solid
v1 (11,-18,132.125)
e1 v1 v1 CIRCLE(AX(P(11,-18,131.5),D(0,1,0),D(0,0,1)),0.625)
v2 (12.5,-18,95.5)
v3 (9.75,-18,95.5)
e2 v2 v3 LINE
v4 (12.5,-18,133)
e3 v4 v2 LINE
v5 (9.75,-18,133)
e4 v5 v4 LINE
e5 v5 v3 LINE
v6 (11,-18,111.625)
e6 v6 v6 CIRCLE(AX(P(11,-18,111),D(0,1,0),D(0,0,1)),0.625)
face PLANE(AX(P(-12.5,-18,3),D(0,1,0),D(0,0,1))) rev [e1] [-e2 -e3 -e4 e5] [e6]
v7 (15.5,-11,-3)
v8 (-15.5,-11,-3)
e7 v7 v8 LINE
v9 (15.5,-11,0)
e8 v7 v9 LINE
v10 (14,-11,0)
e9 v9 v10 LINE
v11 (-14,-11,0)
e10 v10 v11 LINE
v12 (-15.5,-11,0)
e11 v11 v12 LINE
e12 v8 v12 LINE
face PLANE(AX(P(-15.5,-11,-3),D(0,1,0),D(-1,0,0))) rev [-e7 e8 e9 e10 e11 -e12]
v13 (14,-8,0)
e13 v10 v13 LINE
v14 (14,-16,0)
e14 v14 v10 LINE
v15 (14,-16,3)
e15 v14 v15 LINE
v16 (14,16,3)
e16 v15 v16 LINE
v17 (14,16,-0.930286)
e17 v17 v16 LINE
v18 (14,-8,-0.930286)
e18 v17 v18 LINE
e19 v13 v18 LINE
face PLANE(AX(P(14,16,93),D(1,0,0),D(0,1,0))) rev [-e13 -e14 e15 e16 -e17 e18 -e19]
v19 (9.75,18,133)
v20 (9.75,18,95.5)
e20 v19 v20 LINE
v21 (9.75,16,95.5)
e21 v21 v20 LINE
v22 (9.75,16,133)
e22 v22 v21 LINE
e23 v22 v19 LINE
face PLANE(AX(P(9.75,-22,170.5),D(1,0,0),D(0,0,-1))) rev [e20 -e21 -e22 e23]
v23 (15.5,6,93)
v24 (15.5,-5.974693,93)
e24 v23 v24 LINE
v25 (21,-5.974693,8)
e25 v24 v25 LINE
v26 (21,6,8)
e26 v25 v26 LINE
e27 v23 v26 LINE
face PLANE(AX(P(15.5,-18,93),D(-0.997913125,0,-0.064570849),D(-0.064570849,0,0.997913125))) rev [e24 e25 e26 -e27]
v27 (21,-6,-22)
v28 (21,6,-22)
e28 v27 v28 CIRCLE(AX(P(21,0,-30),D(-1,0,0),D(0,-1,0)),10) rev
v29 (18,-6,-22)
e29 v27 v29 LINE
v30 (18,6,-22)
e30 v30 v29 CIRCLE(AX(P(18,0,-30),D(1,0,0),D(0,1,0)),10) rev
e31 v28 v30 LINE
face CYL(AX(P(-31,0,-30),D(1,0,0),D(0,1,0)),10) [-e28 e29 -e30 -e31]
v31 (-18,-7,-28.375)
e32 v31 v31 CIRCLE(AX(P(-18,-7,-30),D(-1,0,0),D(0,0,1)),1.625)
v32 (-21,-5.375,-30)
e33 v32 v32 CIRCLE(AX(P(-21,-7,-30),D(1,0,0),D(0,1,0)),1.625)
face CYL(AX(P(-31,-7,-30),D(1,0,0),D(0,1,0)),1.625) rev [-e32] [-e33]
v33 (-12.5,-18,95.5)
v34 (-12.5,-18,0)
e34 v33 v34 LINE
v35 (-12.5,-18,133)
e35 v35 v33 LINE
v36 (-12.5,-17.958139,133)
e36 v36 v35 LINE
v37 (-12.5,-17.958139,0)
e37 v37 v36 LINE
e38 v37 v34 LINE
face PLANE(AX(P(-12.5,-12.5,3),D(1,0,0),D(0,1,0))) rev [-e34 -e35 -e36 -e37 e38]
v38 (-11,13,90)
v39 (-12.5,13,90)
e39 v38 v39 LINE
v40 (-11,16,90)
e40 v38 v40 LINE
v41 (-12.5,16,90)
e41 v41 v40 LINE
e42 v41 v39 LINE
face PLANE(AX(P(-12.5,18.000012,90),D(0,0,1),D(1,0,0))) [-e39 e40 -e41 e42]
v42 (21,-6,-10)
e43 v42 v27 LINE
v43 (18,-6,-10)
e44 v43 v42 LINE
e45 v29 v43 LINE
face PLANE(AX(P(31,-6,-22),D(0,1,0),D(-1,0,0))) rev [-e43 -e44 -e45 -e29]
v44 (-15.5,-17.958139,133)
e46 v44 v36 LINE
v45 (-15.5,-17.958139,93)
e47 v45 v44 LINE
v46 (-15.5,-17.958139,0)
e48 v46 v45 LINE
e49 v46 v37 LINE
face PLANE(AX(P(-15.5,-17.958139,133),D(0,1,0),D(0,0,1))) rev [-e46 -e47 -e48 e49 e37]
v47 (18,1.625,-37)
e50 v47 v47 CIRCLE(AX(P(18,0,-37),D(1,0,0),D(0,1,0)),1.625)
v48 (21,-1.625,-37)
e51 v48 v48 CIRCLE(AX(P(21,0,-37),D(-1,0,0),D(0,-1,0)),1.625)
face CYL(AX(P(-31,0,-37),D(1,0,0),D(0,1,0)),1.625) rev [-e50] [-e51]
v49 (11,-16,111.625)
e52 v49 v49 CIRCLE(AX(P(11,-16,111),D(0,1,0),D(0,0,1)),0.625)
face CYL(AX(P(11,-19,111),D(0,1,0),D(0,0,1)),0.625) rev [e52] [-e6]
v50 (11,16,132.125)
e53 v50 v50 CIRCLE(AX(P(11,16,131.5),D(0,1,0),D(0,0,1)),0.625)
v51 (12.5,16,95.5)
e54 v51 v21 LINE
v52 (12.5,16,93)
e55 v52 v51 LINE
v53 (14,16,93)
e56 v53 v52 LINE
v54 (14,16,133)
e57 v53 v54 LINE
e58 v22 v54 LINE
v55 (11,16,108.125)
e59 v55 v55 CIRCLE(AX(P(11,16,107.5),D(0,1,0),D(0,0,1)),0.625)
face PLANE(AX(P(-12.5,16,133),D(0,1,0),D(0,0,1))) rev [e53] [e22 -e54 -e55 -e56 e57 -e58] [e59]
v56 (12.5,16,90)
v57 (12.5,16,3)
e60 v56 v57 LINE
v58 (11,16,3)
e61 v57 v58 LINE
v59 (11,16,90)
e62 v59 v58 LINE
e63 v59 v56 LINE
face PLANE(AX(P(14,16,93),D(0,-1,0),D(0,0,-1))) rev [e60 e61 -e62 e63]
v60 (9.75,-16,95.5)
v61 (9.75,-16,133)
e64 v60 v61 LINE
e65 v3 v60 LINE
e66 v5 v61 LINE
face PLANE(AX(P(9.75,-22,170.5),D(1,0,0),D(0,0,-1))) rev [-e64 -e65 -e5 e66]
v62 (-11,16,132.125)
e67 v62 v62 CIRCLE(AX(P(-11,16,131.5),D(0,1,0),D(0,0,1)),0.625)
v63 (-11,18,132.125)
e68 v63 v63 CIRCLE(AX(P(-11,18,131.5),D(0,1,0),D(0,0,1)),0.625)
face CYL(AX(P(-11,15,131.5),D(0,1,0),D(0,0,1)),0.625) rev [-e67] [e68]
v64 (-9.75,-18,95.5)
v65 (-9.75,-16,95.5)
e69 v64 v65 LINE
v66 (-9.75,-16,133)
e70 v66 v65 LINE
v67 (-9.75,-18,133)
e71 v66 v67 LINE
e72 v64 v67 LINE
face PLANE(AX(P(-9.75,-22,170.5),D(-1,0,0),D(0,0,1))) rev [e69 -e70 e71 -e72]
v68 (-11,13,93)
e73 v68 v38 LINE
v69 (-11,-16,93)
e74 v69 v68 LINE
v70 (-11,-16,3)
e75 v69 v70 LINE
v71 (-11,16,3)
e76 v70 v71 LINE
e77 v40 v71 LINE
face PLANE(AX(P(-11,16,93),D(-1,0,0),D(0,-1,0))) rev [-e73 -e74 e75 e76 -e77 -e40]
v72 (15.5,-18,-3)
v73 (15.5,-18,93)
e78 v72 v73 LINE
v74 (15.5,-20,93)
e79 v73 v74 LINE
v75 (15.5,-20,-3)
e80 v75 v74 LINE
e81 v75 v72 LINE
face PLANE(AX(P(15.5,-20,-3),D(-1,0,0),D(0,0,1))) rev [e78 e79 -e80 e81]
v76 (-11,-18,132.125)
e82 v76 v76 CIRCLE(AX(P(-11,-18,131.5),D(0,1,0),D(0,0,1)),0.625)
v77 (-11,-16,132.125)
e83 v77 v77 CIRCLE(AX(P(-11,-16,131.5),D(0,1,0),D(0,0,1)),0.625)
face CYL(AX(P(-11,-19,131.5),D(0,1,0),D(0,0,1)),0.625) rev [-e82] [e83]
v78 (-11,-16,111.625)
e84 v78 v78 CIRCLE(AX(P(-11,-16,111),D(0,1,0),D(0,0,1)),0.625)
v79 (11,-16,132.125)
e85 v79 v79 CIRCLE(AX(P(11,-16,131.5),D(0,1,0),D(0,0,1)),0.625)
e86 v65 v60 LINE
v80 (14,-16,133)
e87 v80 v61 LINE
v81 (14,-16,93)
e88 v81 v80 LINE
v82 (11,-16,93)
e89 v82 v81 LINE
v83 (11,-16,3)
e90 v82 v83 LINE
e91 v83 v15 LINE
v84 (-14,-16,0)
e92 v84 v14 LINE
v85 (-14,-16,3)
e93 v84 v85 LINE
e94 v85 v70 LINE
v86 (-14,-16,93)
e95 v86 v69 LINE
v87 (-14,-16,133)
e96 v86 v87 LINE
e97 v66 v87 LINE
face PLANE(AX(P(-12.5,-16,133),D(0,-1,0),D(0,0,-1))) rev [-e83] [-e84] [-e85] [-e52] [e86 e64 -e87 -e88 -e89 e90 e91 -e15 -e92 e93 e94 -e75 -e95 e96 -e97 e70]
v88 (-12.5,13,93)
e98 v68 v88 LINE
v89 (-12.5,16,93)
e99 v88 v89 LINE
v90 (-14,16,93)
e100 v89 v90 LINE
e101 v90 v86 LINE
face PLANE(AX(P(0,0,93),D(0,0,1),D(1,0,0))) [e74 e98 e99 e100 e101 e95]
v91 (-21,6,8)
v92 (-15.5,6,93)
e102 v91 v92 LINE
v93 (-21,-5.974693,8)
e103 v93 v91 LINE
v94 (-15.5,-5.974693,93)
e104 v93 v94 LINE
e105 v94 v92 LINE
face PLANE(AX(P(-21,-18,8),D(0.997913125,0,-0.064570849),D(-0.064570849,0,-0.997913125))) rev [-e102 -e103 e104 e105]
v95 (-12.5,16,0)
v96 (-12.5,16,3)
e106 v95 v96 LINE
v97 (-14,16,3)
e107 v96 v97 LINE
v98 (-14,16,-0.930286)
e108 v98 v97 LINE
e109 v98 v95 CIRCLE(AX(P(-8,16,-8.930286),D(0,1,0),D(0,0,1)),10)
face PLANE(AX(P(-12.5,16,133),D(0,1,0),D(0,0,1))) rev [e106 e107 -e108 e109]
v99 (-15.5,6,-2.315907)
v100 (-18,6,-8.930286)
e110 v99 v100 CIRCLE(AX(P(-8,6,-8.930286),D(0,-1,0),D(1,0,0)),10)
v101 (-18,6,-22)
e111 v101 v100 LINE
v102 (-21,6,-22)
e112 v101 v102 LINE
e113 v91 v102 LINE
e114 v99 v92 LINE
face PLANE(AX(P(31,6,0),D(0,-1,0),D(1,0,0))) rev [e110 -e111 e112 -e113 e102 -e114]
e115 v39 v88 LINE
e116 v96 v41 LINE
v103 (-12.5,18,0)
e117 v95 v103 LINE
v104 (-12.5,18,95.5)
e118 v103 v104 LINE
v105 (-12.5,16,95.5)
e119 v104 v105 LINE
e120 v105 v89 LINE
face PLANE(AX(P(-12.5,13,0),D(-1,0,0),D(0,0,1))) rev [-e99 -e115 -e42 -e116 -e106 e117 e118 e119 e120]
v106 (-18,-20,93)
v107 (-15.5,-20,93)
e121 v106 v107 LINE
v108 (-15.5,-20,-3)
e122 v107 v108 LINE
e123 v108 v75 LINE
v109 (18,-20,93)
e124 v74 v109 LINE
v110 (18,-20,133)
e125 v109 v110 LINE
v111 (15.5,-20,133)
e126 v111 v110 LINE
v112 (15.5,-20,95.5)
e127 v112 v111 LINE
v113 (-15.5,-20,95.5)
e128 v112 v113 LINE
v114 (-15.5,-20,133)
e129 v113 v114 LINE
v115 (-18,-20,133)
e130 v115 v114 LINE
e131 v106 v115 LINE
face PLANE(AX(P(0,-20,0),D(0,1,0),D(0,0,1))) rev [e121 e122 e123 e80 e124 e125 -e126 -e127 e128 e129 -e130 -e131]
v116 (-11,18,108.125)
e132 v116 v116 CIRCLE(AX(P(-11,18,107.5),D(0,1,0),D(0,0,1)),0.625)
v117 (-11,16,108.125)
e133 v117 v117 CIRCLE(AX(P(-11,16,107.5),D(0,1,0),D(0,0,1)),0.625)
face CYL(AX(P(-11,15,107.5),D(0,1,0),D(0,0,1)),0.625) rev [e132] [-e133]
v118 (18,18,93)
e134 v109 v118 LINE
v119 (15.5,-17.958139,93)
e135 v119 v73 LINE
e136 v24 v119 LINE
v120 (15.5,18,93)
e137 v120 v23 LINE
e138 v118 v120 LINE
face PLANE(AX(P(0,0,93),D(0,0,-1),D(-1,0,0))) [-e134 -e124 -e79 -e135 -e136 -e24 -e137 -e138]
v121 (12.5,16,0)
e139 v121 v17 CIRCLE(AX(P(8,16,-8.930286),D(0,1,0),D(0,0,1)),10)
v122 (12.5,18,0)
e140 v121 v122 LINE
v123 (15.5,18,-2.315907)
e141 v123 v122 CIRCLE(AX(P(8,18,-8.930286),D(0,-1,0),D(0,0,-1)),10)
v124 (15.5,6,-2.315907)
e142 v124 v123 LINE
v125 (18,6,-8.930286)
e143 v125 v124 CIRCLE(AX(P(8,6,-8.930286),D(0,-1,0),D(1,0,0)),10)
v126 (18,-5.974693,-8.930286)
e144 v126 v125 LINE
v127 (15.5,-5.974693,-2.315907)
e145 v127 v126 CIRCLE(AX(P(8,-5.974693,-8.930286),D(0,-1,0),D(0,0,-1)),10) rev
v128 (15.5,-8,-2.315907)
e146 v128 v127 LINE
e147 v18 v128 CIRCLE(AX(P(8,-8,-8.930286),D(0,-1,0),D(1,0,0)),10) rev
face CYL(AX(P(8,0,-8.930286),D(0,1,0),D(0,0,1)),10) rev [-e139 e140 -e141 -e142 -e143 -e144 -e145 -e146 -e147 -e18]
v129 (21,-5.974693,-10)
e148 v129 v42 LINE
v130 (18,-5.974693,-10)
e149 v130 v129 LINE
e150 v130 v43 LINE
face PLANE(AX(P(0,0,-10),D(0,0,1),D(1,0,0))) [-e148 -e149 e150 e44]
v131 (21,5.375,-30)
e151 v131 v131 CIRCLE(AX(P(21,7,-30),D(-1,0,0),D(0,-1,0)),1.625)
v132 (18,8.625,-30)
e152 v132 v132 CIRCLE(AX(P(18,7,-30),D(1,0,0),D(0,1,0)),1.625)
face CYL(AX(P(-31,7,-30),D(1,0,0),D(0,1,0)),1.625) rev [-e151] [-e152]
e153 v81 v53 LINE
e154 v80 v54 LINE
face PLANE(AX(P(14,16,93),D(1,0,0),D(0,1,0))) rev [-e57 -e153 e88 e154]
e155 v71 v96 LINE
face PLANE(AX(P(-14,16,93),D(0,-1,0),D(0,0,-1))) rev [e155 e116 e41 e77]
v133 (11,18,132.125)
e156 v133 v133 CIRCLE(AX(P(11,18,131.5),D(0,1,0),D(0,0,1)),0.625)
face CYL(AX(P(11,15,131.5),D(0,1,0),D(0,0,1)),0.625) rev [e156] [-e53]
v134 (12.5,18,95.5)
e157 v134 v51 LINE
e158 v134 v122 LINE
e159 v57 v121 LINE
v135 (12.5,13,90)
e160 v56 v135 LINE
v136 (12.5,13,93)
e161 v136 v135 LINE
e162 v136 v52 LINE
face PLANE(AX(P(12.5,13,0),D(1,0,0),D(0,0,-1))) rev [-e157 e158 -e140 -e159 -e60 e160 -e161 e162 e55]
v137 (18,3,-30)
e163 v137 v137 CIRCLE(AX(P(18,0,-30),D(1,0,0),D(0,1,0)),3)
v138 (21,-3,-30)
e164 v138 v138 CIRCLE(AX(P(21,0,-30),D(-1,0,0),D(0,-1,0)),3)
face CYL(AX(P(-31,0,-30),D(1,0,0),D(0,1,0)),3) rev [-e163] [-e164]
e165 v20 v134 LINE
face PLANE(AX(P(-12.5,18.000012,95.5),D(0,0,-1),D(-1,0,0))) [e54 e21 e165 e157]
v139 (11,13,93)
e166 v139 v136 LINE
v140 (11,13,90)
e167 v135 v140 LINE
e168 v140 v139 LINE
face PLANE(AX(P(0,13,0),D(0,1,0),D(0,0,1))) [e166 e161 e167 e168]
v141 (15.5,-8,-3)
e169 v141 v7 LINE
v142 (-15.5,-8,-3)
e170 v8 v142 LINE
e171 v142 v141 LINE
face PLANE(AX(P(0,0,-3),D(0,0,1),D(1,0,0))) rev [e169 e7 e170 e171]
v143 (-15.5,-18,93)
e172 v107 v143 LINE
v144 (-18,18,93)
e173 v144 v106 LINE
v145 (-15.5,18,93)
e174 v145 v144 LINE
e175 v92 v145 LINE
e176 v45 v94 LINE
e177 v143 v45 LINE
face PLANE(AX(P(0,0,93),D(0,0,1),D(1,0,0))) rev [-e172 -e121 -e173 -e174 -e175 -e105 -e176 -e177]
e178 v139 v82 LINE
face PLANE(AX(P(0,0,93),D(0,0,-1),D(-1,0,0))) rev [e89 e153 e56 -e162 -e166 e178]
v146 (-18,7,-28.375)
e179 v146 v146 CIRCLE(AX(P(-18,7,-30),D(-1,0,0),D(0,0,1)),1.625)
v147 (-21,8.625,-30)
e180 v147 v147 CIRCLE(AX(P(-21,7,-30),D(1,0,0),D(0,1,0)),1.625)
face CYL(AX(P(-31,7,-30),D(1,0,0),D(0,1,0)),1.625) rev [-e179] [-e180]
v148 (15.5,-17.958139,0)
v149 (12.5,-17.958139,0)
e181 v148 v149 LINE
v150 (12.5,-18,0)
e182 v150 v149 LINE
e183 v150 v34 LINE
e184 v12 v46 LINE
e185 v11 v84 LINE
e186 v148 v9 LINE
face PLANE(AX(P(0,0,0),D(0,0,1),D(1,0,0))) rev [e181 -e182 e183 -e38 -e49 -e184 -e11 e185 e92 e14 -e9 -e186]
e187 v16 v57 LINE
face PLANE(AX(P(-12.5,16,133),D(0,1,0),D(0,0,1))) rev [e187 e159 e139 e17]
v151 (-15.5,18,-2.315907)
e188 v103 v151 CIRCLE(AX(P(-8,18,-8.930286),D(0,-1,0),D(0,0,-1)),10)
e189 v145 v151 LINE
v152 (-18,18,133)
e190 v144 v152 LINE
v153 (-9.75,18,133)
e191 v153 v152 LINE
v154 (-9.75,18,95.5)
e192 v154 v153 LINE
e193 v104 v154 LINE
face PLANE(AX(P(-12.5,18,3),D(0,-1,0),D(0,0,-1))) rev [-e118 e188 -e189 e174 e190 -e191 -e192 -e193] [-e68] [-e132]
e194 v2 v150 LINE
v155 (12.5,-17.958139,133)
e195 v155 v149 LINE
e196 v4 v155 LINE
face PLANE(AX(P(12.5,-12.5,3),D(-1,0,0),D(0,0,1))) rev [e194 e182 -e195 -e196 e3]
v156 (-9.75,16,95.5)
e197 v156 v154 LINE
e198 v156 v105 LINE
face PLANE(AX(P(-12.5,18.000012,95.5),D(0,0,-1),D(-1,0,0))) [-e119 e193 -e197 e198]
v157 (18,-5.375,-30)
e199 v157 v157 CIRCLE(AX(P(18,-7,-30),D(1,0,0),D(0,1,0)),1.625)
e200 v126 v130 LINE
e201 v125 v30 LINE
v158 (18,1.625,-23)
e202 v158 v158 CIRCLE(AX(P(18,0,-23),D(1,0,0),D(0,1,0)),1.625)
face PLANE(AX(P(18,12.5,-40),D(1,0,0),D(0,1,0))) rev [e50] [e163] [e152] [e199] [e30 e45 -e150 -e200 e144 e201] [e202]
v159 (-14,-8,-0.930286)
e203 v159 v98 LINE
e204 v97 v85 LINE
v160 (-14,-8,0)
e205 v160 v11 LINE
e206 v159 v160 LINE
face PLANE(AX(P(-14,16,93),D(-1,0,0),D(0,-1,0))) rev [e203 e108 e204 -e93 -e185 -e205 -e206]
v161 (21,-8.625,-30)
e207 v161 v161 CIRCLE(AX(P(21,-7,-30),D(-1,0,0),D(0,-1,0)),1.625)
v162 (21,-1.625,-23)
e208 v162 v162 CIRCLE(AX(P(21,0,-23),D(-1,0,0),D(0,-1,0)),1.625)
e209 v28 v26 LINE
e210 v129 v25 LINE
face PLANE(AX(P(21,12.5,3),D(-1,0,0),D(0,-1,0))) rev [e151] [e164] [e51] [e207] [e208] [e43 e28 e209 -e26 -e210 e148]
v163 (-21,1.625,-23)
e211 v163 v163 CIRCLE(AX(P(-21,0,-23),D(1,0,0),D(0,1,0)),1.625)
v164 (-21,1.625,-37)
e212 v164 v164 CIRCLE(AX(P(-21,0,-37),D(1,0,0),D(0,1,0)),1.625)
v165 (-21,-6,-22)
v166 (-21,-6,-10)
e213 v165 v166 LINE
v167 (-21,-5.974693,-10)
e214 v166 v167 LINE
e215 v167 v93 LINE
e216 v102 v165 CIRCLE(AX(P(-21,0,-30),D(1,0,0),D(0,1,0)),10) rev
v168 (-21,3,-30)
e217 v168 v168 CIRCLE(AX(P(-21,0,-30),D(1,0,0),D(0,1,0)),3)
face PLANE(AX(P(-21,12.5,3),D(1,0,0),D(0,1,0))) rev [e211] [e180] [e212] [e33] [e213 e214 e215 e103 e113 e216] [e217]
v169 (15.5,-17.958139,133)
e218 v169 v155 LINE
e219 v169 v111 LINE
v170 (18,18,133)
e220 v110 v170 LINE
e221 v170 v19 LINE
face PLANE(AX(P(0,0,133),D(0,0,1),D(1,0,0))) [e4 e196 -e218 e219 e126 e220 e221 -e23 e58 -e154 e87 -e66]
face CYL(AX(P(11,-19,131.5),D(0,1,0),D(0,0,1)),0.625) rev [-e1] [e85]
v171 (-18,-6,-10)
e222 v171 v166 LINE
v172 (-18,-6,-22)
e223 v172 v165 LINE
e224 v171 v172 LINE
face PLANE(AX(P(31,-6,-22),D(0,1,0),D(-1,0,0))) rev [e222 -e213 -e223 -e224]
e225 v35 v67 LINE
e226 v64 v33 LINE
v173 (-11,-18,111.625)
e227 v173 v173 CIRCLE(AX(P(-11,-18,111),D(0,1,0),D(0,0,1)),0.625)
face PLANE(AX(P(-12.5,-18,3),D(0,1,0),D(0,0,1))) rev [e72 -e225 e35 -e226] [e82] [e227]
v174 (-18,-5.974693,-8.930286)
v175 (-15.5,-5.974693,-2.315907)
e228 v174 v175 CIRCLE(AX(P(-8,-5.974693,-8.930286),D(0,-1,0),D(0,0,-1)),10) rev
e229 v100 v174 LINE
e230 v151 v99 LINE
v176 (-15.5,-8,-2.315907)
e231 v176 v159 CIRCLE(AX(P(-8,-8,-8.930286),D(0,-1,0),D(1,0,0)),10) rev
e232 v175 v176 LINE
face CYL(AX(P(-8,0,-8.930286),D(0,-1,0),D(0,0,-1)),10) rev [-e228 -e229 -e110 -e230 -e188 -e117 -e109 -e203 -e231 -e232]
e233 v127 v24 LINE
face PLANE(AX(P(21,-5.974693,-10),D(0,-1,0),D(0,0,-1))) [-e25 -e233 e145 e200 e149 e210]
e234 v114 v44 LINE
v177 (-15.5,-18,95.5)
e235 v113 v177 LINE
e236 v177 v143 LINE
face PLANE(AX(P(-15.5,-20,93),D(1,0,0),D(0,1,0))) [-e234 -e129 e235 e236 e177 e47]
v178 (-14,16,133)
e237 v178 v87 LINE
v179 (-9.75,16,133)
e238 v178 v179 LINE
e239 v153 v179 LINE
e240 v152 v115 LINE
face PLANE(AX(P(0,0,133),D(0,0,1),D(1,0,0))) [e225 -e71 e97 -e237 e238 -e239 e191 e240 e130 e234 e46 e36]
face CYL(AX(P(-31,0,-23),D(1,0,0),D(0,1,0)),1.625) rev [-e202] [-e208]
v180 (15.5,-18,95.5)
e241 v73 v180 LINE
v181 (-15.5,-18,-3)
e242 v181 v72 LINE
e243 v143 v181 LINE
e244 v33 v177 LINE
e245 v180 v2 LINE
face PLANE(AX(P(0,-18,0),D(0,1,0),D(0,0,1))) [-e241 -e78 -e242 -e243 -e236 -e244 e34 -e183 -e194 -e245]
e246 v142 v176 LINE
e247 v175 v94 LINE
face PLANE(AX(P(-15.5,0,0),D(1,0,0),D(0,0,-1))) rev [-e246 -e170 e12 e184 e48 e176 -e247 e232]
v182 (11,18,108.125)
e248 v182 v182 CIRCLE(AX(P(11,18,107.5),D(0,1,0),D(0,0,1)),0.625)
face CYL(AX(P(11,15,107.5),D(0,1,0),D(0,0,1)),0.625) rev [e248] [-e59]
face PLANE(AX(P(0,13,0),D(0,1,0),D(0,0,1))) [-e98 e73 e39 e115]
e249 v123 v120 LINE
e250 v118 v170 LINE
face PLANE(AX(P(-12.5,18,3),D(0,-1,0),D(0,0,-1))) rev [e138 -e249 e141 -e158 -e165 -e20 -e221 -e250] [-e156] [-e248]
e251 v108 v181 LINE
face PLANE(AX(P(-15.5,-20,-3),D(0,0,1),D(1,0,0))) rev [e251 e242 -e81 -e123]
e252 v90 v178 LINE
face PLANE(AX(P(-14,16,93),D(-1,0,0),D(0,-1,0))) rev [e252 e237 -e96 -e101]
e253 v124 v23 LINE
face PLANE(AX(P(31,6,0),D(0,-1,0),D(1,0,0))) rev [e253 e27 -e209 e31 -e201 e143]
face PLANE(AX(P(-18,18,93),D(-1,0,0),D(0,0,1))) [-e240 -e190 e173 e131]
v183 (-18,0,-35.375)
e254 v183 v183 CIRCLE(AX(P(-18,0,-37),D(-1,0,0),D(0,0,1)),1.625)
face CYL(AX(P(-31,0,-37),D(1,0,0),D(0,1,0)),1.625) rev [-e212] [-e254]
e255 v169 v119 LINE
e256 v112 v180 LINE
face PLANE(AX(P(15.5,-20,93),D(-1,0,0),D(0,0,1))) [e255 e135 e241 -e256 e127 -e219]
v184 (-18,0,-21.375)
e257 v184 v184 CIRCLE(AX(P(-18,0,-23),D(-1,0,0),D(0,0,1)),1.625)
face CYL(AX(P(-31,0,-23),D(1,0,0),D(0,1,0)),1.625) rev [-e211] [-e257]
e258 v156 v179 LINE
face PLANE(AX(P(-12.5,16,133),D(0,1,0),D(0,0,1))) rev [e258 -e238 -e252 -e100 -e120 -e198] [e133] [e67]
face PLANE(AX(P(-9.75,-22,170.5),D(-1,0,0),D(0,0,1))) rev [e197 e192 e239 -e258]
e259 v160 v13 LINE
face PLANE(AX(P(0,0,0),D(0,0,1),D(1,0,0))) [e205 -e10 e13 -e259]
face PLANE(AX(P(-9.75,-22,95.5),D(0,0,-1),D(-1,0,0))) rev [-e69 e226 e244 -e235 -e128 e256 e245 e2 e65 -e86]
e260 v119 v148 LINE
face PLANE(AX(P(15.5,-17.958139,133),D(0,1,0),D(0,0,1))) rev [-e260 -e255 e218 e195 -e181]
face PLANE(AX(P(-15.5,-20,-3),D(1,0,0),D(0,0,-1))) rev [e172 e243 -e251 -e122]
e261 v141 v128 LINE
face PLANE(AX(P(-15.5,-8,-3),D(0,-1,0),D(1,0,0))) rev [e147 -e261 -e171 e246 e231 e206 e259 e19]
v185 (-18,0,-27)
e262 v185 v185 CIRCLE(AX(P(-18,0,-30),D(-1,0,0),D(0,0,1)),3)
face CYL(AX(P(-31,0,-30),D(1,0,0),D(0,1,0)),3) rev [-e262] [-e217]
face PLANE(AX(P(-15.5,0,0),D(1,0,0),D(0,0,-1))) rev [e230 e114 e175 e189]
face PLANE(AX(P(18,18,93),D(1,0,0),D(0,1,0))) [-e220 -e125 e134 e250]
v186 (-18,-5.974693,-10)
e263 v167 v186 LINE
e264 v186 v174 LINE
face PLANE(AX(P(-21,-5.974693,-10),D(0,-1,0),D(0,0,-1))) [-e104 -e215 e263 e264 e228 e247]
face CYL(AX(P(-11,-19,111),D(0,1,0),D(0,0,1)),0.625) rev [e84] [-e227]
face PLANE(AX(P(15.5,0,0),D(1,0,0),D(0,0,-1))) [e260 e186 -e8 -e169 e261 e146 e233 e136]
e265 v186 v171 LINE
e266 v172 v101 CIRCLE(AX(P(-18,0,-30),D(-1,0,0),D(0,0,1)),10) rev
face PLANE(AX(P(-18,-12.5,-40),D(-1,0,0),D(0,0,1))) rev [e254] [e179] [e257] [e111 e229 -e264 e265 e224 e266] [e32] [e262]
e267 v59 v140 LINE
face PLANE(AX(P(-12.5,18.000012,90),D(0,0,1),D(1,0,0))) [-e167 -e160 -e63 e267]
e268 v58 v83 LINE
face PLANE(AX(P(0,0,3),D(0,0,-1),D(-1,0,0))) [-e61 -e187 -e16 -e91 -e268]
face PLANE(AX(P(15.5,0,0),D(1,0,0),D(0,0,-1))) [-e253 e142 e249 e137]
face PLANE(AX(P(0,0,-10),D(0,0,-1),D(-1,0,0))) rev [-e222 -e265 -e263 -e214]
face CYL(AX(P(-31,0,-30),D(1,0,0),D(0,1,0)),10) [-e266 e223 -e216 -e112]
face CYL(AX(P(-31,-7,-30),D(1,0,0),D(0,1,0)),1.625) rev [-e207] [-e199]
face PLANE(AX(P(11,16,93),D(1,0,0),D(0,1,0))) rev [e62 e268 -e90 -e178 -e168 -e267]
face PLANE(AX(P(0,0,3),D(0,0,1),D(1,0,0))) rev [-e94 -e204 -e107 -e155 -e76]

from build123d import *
from build123d.topology import SkipClean

# Parameters (mm, degrees)
BOSS_EXTRUDE1_DEPTH      = 3
SKETCH2_W                = 25
SKETCH2_H                = 2
BOSS_EXTRUDE2_DEPTH      = 130
SKETCH3_R                = 0.625
CUT_EXTRUDE1_DEPTH       = 3
SKETCH4_R                = 0.625
CUT_EXTRUDE2_DEPTH       = 3
SKETCH5_W                = 3
SKETCH5_H                = 25
BOSS_EXTRUDE3_DEPTH      = 40
SKETCH7_W                = 19.5
SKETCH7_H                = 75
CUT_EXTRUDE5_DEPTH       = 40
SKETCH10_W               = 25
SKETCH10_H               = 3
BOSS_EXTRUDE4_DEPTH      = 10
SKETCH11_W               = 25
SKETCH11_H               = 3
BOSS_EXTRUDE5_DEPTH      = 10
SKETCH12_W               = 3
SKETCH12_H               = 25
BOSS_EXTRUDE6_DEPTH      = 10
SKETCH13_W               = 3
SKETCH13_H               = 25
BOSS_EXTRUDE7_DEPTH      = 10
SKETCH14_W               = 133
SKETCH14_H               = 35.95813892
BOSS_EXTRUDE11_DEPTH     = 3
SKETCH15_W               = 133
SKETCH15_H               = 35.95813892
BOSS_EXTRUDE12_DEPTH     = 3
SKETCH16_W               = 23
SKETCH16_H               = 28
CUT_EXTRUDE6_DEPTH       = 13
CUT_EXTRUDE7_DEPTH       = 146.523194028
CUT_EXTRUDE7_DEPTH_BACK  = 146.523194028
SKETCH6_R                = 1.625
SKETCH6_R_2              = 3
FILLET1_R                = 10
FILLET2_R                = 10
SKETCH17_W               = 3
SKETCH17_H               = 2.5
CUT_EXTRUDE8_DEPTH       = 30
SKETCH19_W               = 28
SKETCH19_H               = 32
CUT_EXTRUDE9_DEPTH       = 40
CUT_EXTRUDE11_DEPTH      = 137.54669531
CUT_EXTRUDE11_DEPTH_BACK = 137.54669531
SKETCH20_W               = 25.25
SKETCH20_H               = 11.847644437
SKETCH20_W_2             = 25
SKETCH20_H_2             = 13.837487399
CUT_EXTRUDE12_DEPTH      = 144.934012659
CUT_EXTRUDE12_DEPTH_BACK = 144.934012659
CUT_EXTRUDE13_DEPTH      = 138.746143322
CUT_EXTRUDE13_DEPTH_BACK = 138.746143322
SKETCH22_W               = 10
SKETCH22_H               = 25
CUT_EXTRUDE14_DEPTH      = 10
CUT_EXTRUDE14_DEPTH_BACK = 10
SKETCH24_W               = 5.5
SKETCH24_H               = 6.5
SKETCH24_H_2             = 6.525307194
CUT_EXTRUDE15_DEPTH      = 176.197031938
CUT_EXTRUDE15_DEPTH_BACK = 176.197031938
SKETCH25_W               = 28
SKETCH25_H               = 32
SKETCH31_W               = 25
SKETCH31_H               = 90
CUT_EXTRUDE17_DEPTH      = 5
SKETCH32_W               = 31
SKETCH32_H               = 3
BOSS_EXTRUDE16_DEPTH     = 3
SKETCH33_W               = 5.5
SKETCH33_H               = 11.974692806
SKETCH33_W_2             = 3
SKETCH33_H_2             = 32
BOSS_EXTRUDE17_DEPTH     = 90
CUT_EXTRUDE18_DEPTH      = 137.769879725
CUT_EXTRUDE18_DEPTH_BACK = 137.769879725
FILLET3_START            = -5.974692806
FILLET3_DEPTH            = 11.974692806
FILLET3_START_2          = -10
FILLET3_2_DEPTH          = 28
FILLET3_START_3          = 16
FILLET3_3_DEPTH          = 2
FILLET4_START            = -5.974692806
FILLET4_DEPTH            = 11.974692806
FILLET4_START_2          = -10
FILLET4_2_DEPTH          = 28
FILLET4_START_3          = 16
FILLET4_3_DEPTH          = 2
SKETCH35_W               = 31
SKETCH35_H               = 98.5
BOSS_EXTRUDE18_DEPTH     = 2
SKETCH38_W               = 2.5
SKETCH38_H               = 38
BOSS_EXTRUDE22_DEPTH     = 40
CUT_EXTRUDE19_DEPTH      = 140.907112042
CUT_EXTRUDE19_DEPTH_BACK = 5
SKETCH39_W               = 25
SKETCH39_H               = 5.5


with BuildPart() as part:
    # Sketch1 → Boss-Extrude1 (new body)
    with BuildSketch(Plane.XY):
        Polygon((12.5, 12.5), (21, 12.5), (21, -12.5), (12.5, -12.5), (12.5, -18), (-12.5, -18), (-12.5, -12.5), (-21, -12.5), (-21, 12.5), (-12.5, 12.5), (-12.5, 18), (12.5, 18), align=None)
    extrude(amount=BOSS_EXTRUDE1_DEPTH)

    # Sketch2 → Boss-Extrude2 (add)
    with BuildSketch(Plane.XY.offset(3)):
        with Locations((0, 17)):
            Rectangle(SKETCH2_W, SKETCH2_H)
        with Locations((0, -17)):
            Rectangle(SKETCH2_W, SKETCH2_H)
    extrude(amount=BOSS_EXTRUDE2_DEPTH)

    # Sketch3 → Cut-Extrude1 (cut)
    with BuildSketch(Plane(origin=(0, 18, 0), x_dir=(1, 0, 0), z_dir=(0, 1, 0))):
        with Locations(Location((-11, -107.5, 0), (0, 0, 270))):
            Circle(SKETCH3_R)
        with Locations(Location((11, -107.5, 0), (0, 0, 270))):
            Circle(SKETCH3_R)
        with Locations(Location((-11, -131.5, 0), (0, 0, 270))):
            Circle(SKETCH3_R)
        with Locations(Location((11, -131.5, 0), (0, 0, 270))):
            Circle(SKETCH3_R)
    extrude(amount=-CUT_EXTRUDE1_DEPTH, mode=Mode.SUBTRACT)

    # Sketch4 → Cut-Extrude2 (cut)
    with BuildSketch(Plane(origin=(0, -16, 0), x_dir=(1, 0, 0), z_dir=(0, 1, 0))):
        with Locations(Location((-11, -131.5, 0), (0, 0, 270))):
            Circle(SKETCH4_R)
        with Locations(Location((11, -131.5, 0), (0, 0, 270))):
            Circle(SKETCH4_R)
        with Locations(Location((-11, -111, 0), (0, 0, 270))):
            Circle(SKETCH4_R)
        with Locations(Location((11, -111, 0), (0, 0, 270))):
            Circle(SKETCH4_R)
    extrude(amount=-CUT_EXTRUDE2_DEPTH, mode=Mode.SUBTRACT)

    # Sketch5 → Boss-Extrude3 (add)
    with BuildSketch(Plane(origin=(0, 0, 0), x_dir=(-1, 0, 0), z_dir=(0, 0, -1))):
        with Locations((-19.5, 0)):
            Rectangle(SKETCH5_W, SKETCH5_H)
        with Locations((19.5, 0)):
            Rectangle(SKETCH5_W, SKETCH5_H)
    extrude(amount=BOSS_EXTRUDE3_DEPTH)

    # Sketch7 → Cut-Extrude5 (cut)
    with BuildSketch(Plane(origin=(0, 18, 0), x_dir=(1, 0, 0), z_dir=(0, 1, 0))):
        with Locations((0, -133)):
            Rectangle(SKETCH7_W, SKETCH7_H)
    extrude(amount=-CUT_EXTRUDE5_DEPTH, mode=Mode.SUBTRACT)

    # Sketch10 → Boss-Extrude4 (add)
    with BuildSketch(Plane(origin=(0, 18, 0), x_dir=(1, 0, 0), z_dir=(0, 1, 0))):
        with Locations((0, -1.5)):
            Rectangle(SKETCH10_W, SKETCH10_H)
    extrude(amount=BOSS_EXTRUDE4_DEPTH)

    # Sketch11 → Boss-Extrude5 (add)
    with BuildSketch(Plane.XZ.offset(18)):
        with Locations((0, 1.5)):
            Rectangle(SKETCH11_W, SKETCH11_H)
    extrude(amount=BOSS_EXTRUDE5_DEPTH)

    # Sketch12 → Boss-Extrude6 (add)
    with BuildSketch(Plane.ZY.offset(21)):
        with Locations((1.5, 0)):
            Rectangle(SKETCH12_W, SKETCH12_H)
    extrude(amount=BOSS_EXTRUDE6_DEPTH)

    # Sketch13 → Boss-Extrude7 (add)
    with BuildSketch(Plane(origin=(21, 0, 0), x_dir=(0, 0, -1), z_dir=(1, 0, 0))):
        with Locations((-1.5, 0)):
            Rectangle(SKETCH13_W, SKETCH13_H)
    extrude(amount=BOSS_EXTRUDE7_DEPTH)

    # Sketch14 → Boss-Extrude11 (add)
    with BuildSketch(Plane.ZY.offset(12.5)):
        with Locations((66.5, 0.02093054)):
            Rectangle(SKETCH14_W, SKETCH14_H)
    extrude(amount=BOSS_EXTRUDE11_DEPTH)

    # Sketch15 → Boss-Extrude12 (add)
    with BuildSketch(Plane(origin=(12.5, 0, 0), x_dir=(0, 0, -1), z_dir=(1, 0, 0))):
        with Locations((-66.5, 0.02093054)):
            Rectangle(SKETCH15_W, SKETCH15_H)
    extrude(amount=BOSS_EXTRUDE12_DEPTH)

    # Sketch16 → Cut-Extrude6 (cut)
    with BuildSketch(Plane(origin=(0, 0, 0), x_dir=(-1, 0, 0), z_dir=(0, 0, -1))):
        Rectangle(SKETCH16_W, SKETCH16_H)
    extrude(amount=-CUT_EXTRUDE6_DEPTH, mode=Mode.SUBTRACT)

    # Sketch6 → Cut-Extrude7 (cut, two sides: drawn at the far end of the back side and taken through both)
    with BuildSketch(Plane(origin=(21, 0, 0), x_dir=(0, 0, -1), z_dir=(1, 0, 0)).offset(-CUT_EXTRUDE7_DEPTH_BACK)):
        with Locations(Location((30, 7, 0), (0, 0, 90))):
            Circle(SKETCH6_R)
        with Locations(Location((30, 0, 0), (0, 0, 90))):
            Circle(SKETCH6_R_2)
        with Locations(Location((37, 0, 0), (0, 0, 90))):
            Circle(SKETCH6_R)
        with Locations(Location((30, -7, 0), (0, 0, 90))):
            Circle(SKETCH6_R)
        with Locations(Location((23, 0, 0), (0, 0, 90))):
            Circle(SKETCH6_R)
        with BuildLine():
            Line((30, 10), (30, 12.5))
            Line((30, 12.5), (46.457343261, 12.5))
            Line((46.457343261, 12.5), (46.457343261, -12.5))
            Line((46.457343261, -12.5), (30, -12.5))
            Line((30, -12.5), (30, -10))
            ThreePointArc((30, -10), (40, 0), (30, 10))
        make_face()
    extrude(amount=CUT_EXTRUDE7_DEPTH + CUT_EXTRUDE7_DEPTH_BACK, mode=Mode.SUBTRACT)

    # Fillet1
    fillet1_edges = [part.edges().sort_by_distance(p)[0] for p in [
        (31, 12.5, 1.5),
    ]]
    fillet(fillet1_edges, radius=FILLET1_R)

    # Fillet2
    fillet2_edges = [part.edges().sort_by_distance(p)[0] for p in [
        (12.5, 28, 1.5),
        (-12.5, 28, 1.5),
        (-31, 12.5, 1.5),
        (12.5, -28, 1.5),
        (-31, -12.5, 1.5),
        (-12.5, -28, 1.5),
        (31, -12.5, 1.5),
    ]]
    fillet(fillet2_edges, radius=FILLET2_R - 0.0001)  # a hair under: the kernel refuses the full size

    # Sketch17 → Cut-Extrude8 (cut)
    with BuildSketch(Plane(origin=(0, 0, -30), x_dir=(-1, 0, 0), z_dir=(0, 0, -1))):
        with Locations((-19.5, 11.25)):
            Rectangle(SKETCH17_W, SKETCH17_H)
        with Locations((-19.5, -11.25)):
            Rectangle(SKETCH17_W, SKETCH17_H)
        with Locations((19.5, 11.25)):
            Rectangle(SKETCH17_W, SKETCH17_H)
        with Locations((19.5, -11.25)):
            Rectangle(SKETCH17_W, SKETCH17_H)
    extrude(amount=-CUT_EXTRUDE8_DEPTH, mode=Mode.SUBTRACT)

    # Sketch19 → Cut-Extrude9 (cut)
    with BuildSketch(Plane.XY.offset(133)):
        Rectangle(SKETCH19_W, SKETCH19_H)
    extrude(amount=-CUT_EXTRUDE9_DEPTH, mode=Mode.SUBTRACT)

    # Sketch20 → Cut-Extrude11 (cut, two sides: drawn at the far end of the back side and taken through both)
    with BuildSketch(Plane.XY.offset(3).offset(-CUT_EXTRUDE11_DEPTH_BACK)):
        with Locations((0, 23.923822218)):
            Rectangle(SKETCH20_W, SKETCH20_H)
        with Locations((0, -24.918743699)):
            Rectangle(SKETCH20_W_2, SKETCH20_H_2)
    extrude(amount=CUT_EXTRUDE11_DEPTH + CUT_EXTRUDE11_DEPTH_BACK, mode=Mode.SUBTRACT)

    # Sketch21 → Cut-Extrude12 (cut, two sides: drawn at the far end of the back side and taken through both)
    with SkipClean():  # the faces are left unmerged after this step: merging them gives an invalid solid
        with BuildSketch(Plane.ZY.offset(21).offset(-CUT_EXTRUDE12_DEPTH_BACK)):
            with BuildLine():
                Line((-30, 10), (0, 10))
                Line((0, 10), (0, 6))
                Line((0, 6), (-22, 6))
                ThreePointArc((-22, 6), (-25.527864045, 8.94427191), (-30, 10))
            make_face()
            with BuildLine():
                Line((-22, -6), (0, -6))
                Line((0, -6), (0, -10))
                Line((0, -10), (-30, -10))
                ThreePointArc((-30, -10), (-25.527864045, -8.94427191), (-22, -6))
            make_face()
        extrude(amount=CUT_EXTRUDE12_DEPTH + CUT_EXTRUDE12_DEPTH_BACK, mode=Mode.SUBTRACT)

    # Sketch22 → Cut-Extrude13 (cut, two sides: drawn at the far end of the back side and taken through both)
    with SkipClean():  # the faces are left unmerged after this step: merging them gives an invalid solid
        with BuildSketch(Plane(origin=(0, 0, 0), x_dir=(-1, 0, 0), z_dir=(0, 0, -1)).offset(-CUT_EXTRUDE13_DEPTH_BACK)):
            with Locations((26, 0)):
                Rectangle(SKETCH22_W, SKETCH22_H)
            with Locations((-26, 0)):
                Rectangle(SKETCH22_W, SKETCH22_H)
        extrude(amount=CUT_EXTRUDE13_DEPTH + CUT_EXTRUDE13_DEPTH_BACK, mode=Mode.SUBTRACT)

    # Sketch24 → Cut-Extrude14 (cut, two sides: drawn at the far end of the back side and taken through both)
    with SkipClean():  # the faces are left unmerged after this step: merging them gives an invalid solid
        with BuildSketch(Plane(origin=(0, 0, 0), x_dir=(-1, 0, 0), z_dir=(0, 0, -1)).offset(-CUT_EXTRUDE14_DEPTH_BACK)):
            with Locations((18.25, 9.25)):
                Rectangle(SKETCH24_W, SKETCH24_H)
            with Locations((18.25, -9.237346403)):
                Rectangle(SKETCH24_W, SKETCH24_H_2)
            with Locations((-18.25, -9.237346403)):
                Rectangle(SKETCH24_W, SKETCH24_H_2)
            with Locations((-18.25, 9.25)):
                Rectangle(SKETCH24_W, SKETCH24_H)
        extrude(amount=CUT_EXTRUDE14_DEPTH + CUT_EXTRUDE14_DEPTH_BACK, mode=Mode.SUBTRACT)

    # Sketch25 → Cut-Extrude15 (cut, two sides: drawn at the far end of the back side and taken through both)
    with SkipClean():  # the faces are left unmerged after this step: merging them gives an invalid solid
        with BuildSketch(Plane.XY.offset(133).offset(-CUT_EXTRUDE15_DEPTH_BACK)):
            Rectangle(SKETCH25_W, SKETCH25_H)
        extrude(amount=CUT_EXTRUDE15_DEPTH + CUT_EXTRUDE15_DEPTH_BACK, mode=Mode.SUBTRACT)

    # Sketch31 → Cut-Extrude17 (cut)
    with SkipClean():  # the faces are left unmerged after this step: merging them gives an invalid solid
        with BuildSketch(Plane(origin=(0, 18, 0), x_dir=(1, 0, 0), z_dir=(0, 1, 0))):
            with Locations((0, -45)):
                Rectangle(SKETCH31_W, SKETCH31_H)
        extrude(amount=-CUT_EXTRUDE17_DEPTH, mode=Mode.SUBTRACT)

    # Sketch32 → Boss-Extrude16 (add)
    with SkipClean():  # the faces are left unmerged after this step: merging them gives an invalid solid
        with BuildSketch(Plane(origin=(0, 0, 0), x_dir=(-1, 0, 0), z_dir=(0, 0, -1))):
            with Locations((0, -9.5)):
                Rectangle(SKETCH32_W, SKETCH32_H)
        extrude(amount=BOSS_EXTRUDE16_DEPTH)

    # Sketch33 → Boss-Extrude17 (add)
    with SkipClean():  # the faces are left unmerged after this step: merging them gives an invalid solid
        with BuildSketch(Plane.XY.offset(3)):
            with Locations((18.25, 0.012653597)):
                Rectangle(SKETCH33_W, SKETCH33_H)
            with Locations((-18.25, 0.012653597)):
                Rectangle(SKETCH33_W, SKETCH33_H)
            with Locations((-12.5, 0)):
                Rectangle(SKETCH33_W_2, SKETCH33_H_2)
            with Locations((12.5, 0)):
                Rectangle(SKETCH33_W_2, SKETCH33_H_2)
        extrude(amount=BOSS_EXTRUDE17_DEPTH)

    # Sketch34 → Cut-Extrude18 (cut, two sides: drawn at the far end of the back side and taken through both)
    with SkipClean():  # the faces are left unmerged after this step: merging them gives an invalid solid
        with BuildSketch(Plane(origin=(0, 6, 0), x_dir=(1, 0, 0), z_dir=(0, 1, 0)).offset(-CUT_EXTRUDE18_DEPTH_BACK)):
            Polygon((15.5, -93), (21, -8), (21, -93), align=None)
            Polygon((-15.5, -93), (-21, -93), (-21, -8), align=None)
        extrude(amount=CUT_EXTRUDE18_DEPTH + CUT_EXTRUDE18_DEPTH_BACK, mode=Mode.SUBTRACT)

    # Fillet3: read off the stored shape, not the designer's step
    # Fillet3 outline → Fillet3 (add)
    with SkipClean():  # the faces are left unmerged after this step: merging them gives an invalid solid
        with BuildSketch(Plane(origin=(0, 0, 0), x_dir=(1, 0, 0), z_dir=(0, 1, 0)).offset(FILLET3_START)):
            with BuildLine():
                Line((-14, 0), (-14, 0.93028555))
                ThreePointArc((-14, 0.93028555), (-16.94427191, 4.458149595), (-18, 8.93028555))
                Line((-18, 8.93028555), (-18, 0))
                Line((-18, 0), (-14, 0))
            make_face()
        extrude(amount=FILLET3_DEPTH)

    # Fillet3 2 outline → Fillet3 2 (add)
    with SkipClean():  # the faces are left unmerged after this step: merging them gives an invalid solid
        with BuildSketch(Plane(origin=(0, 0, 0), x_dir=(1, 0, 0), z_dir=(0, 1, 0)).offset(FILLET3_START_2)):
            with BuildLine():
                Line((-14, 0), (-14, 0.93028555))
                ThreePointArc((-14, 0.93028555), (-14.785461435, 1.584707757), (-15.5, 2.315907272))
                Line((-15.5, 2.315907272), (-15.5, 0))
                Line((-15.5, 0), (-14, 0))
            make_face()
        extrude(amount=FILLET3_2_DEPTH)

    # Fillet3 3 outline → Fillet3 3 (add)
    with SkipClean():  # the faces are left unmerged after this step: merging them gives an invalid solid
        with BuildSketch(Plane(origin=(0, 0, 0), x_dir=(1, 0, 0), z_dir=(0, 1, 0)).offset(FILLET3_START_3)):
            with BuildLine():
                ThreePointArc((-12.5, 0), (-13.270565226, 0.431983237), (-14, 0.93028555))
                Line((-14, 0.93028555), (-14, 0))
                Line((-14, 0), (-12.5, 0))
            make_face()
        extrude(amount=FILLET3_3_DEPTH)

    # Fillet4: read off the stored shape, not the designer's step
    # Fillet4 outline → Fillet4 (add)
    with SkipClean():  # the faces are left unmerged after this step: merging them gives an invalid solid
        with BuildSketch(Plane(origin=(0, 0, 0), x_dir=(1, 0, 0), z_dir=(0, 1, 0)).offset(FILLET4_START)):
            with BuildLine():
                Line((14, 0.93028555), (14, 0))
                Line((14, 0), (18, 0))
                Line((18, 0), (18, 8.93028555))
                ThreePointArc((18, 8.93028555), (16.94427191, 4.458149595), (14, 0.93028555))
            make_face()
        extrude(amount=FILLET4_DEPTH)

    # Fillet4 2 outline → Fillet4 2 (add)
    with SkipClean():  # the faces are left unmerged after this step: merging them gives an invalid solid
        with BuildSketch(Plane(origin=(0, 0, 0), x_dir=(1, 0, 0), z_dir=(0, 1, 0)).offset(FILLET4_START_2)):
            with BuildLine():
                Line((14, 0.93028555), (14, 0))
                Line((14, 0), (15.5, 0))
                Line((15.5, 0), (15.5, 2.315907272))
                ThreePointArc((15.5, 2.315907272), (14.785461435, 1.584707757), (14, 0.93028555))
            make_face()
        extrude(amount=FILLET4_2_DEPTH)

    # Fillet4 3 outline → Fillet4 3 (add)
    with SkipClean():  # the faces are left unmerged after this step: merging them gives an invalid solid
        with BuildSketch(Plane(origin=(0, 0, 0), x_dir=(1, 0, 0), z_dir=(0, 1, 0)).offset(FILLET4_START_3)):
            with BuildLine():
                Line((12.5, 0), (14, 0))
                Line((14, 0), (14, 0.93028555))
                ThreePointArc((14, 0.93028555), (13.270565226, 0.431983237), (12.5, 0))
            make_face()
        extrude(amount=FILLET4_3_DEPTH)

    # Sketch35 → Boss-Extrude18 (add)
    with SkipClean():  # the faces are left unmerged after this step: merging them gives an invalid solid
        with BuildSketch(Plane.XZ.offset(18)):
            with Locations((0, 46.25)):
                Rectangle(SKETCH35_W, SKETCH35_H)
        extrude(amount=BOSS_EXTRUDE18_DEPTH)

    # Sketch38 → Boss-Extrude22 (add)
    with SkipClean():  # the faces are left unmerged after this step: merging them gives an invalid solid
        with BuildSketch(Plane.XY.offset(133)):
            with Locations((16.75, -1)):
                Rectangle(SKETCH38_W, SKETCH38_H)
            with Locations((-16.75, -1)):
                Rectangle(SKETCH38_W, SKETCH38_H)
        extrude(amount=-BOSS_EXTRUDE22_DEPTH)

    # Sketch39 → Cut-Extrude19 (cut, two sides: drawn at the far end of the back side and taken through both)
    with SkipClean():  # the faces are left unmerged after this step: merging them gives an invalid solid
        with BuildSketch(Plane(origin=(0, 18, 0), x_dir=(1, 0, 0), z_dir=(0, 1, 0)).offset(-CUT_EXTRUDE19_DEPTH_BACK)):
            with Locations((0, -92.75)):
                Rectangle(SKETCH39_W, SKETCH39_H)
        extrude(amount=CUT_EXTRUDE19_DEPTH + CUT_EXTRUDE19_DEPTH_BACK, mode=Mode.SUBTRACT)


solid = part.part
